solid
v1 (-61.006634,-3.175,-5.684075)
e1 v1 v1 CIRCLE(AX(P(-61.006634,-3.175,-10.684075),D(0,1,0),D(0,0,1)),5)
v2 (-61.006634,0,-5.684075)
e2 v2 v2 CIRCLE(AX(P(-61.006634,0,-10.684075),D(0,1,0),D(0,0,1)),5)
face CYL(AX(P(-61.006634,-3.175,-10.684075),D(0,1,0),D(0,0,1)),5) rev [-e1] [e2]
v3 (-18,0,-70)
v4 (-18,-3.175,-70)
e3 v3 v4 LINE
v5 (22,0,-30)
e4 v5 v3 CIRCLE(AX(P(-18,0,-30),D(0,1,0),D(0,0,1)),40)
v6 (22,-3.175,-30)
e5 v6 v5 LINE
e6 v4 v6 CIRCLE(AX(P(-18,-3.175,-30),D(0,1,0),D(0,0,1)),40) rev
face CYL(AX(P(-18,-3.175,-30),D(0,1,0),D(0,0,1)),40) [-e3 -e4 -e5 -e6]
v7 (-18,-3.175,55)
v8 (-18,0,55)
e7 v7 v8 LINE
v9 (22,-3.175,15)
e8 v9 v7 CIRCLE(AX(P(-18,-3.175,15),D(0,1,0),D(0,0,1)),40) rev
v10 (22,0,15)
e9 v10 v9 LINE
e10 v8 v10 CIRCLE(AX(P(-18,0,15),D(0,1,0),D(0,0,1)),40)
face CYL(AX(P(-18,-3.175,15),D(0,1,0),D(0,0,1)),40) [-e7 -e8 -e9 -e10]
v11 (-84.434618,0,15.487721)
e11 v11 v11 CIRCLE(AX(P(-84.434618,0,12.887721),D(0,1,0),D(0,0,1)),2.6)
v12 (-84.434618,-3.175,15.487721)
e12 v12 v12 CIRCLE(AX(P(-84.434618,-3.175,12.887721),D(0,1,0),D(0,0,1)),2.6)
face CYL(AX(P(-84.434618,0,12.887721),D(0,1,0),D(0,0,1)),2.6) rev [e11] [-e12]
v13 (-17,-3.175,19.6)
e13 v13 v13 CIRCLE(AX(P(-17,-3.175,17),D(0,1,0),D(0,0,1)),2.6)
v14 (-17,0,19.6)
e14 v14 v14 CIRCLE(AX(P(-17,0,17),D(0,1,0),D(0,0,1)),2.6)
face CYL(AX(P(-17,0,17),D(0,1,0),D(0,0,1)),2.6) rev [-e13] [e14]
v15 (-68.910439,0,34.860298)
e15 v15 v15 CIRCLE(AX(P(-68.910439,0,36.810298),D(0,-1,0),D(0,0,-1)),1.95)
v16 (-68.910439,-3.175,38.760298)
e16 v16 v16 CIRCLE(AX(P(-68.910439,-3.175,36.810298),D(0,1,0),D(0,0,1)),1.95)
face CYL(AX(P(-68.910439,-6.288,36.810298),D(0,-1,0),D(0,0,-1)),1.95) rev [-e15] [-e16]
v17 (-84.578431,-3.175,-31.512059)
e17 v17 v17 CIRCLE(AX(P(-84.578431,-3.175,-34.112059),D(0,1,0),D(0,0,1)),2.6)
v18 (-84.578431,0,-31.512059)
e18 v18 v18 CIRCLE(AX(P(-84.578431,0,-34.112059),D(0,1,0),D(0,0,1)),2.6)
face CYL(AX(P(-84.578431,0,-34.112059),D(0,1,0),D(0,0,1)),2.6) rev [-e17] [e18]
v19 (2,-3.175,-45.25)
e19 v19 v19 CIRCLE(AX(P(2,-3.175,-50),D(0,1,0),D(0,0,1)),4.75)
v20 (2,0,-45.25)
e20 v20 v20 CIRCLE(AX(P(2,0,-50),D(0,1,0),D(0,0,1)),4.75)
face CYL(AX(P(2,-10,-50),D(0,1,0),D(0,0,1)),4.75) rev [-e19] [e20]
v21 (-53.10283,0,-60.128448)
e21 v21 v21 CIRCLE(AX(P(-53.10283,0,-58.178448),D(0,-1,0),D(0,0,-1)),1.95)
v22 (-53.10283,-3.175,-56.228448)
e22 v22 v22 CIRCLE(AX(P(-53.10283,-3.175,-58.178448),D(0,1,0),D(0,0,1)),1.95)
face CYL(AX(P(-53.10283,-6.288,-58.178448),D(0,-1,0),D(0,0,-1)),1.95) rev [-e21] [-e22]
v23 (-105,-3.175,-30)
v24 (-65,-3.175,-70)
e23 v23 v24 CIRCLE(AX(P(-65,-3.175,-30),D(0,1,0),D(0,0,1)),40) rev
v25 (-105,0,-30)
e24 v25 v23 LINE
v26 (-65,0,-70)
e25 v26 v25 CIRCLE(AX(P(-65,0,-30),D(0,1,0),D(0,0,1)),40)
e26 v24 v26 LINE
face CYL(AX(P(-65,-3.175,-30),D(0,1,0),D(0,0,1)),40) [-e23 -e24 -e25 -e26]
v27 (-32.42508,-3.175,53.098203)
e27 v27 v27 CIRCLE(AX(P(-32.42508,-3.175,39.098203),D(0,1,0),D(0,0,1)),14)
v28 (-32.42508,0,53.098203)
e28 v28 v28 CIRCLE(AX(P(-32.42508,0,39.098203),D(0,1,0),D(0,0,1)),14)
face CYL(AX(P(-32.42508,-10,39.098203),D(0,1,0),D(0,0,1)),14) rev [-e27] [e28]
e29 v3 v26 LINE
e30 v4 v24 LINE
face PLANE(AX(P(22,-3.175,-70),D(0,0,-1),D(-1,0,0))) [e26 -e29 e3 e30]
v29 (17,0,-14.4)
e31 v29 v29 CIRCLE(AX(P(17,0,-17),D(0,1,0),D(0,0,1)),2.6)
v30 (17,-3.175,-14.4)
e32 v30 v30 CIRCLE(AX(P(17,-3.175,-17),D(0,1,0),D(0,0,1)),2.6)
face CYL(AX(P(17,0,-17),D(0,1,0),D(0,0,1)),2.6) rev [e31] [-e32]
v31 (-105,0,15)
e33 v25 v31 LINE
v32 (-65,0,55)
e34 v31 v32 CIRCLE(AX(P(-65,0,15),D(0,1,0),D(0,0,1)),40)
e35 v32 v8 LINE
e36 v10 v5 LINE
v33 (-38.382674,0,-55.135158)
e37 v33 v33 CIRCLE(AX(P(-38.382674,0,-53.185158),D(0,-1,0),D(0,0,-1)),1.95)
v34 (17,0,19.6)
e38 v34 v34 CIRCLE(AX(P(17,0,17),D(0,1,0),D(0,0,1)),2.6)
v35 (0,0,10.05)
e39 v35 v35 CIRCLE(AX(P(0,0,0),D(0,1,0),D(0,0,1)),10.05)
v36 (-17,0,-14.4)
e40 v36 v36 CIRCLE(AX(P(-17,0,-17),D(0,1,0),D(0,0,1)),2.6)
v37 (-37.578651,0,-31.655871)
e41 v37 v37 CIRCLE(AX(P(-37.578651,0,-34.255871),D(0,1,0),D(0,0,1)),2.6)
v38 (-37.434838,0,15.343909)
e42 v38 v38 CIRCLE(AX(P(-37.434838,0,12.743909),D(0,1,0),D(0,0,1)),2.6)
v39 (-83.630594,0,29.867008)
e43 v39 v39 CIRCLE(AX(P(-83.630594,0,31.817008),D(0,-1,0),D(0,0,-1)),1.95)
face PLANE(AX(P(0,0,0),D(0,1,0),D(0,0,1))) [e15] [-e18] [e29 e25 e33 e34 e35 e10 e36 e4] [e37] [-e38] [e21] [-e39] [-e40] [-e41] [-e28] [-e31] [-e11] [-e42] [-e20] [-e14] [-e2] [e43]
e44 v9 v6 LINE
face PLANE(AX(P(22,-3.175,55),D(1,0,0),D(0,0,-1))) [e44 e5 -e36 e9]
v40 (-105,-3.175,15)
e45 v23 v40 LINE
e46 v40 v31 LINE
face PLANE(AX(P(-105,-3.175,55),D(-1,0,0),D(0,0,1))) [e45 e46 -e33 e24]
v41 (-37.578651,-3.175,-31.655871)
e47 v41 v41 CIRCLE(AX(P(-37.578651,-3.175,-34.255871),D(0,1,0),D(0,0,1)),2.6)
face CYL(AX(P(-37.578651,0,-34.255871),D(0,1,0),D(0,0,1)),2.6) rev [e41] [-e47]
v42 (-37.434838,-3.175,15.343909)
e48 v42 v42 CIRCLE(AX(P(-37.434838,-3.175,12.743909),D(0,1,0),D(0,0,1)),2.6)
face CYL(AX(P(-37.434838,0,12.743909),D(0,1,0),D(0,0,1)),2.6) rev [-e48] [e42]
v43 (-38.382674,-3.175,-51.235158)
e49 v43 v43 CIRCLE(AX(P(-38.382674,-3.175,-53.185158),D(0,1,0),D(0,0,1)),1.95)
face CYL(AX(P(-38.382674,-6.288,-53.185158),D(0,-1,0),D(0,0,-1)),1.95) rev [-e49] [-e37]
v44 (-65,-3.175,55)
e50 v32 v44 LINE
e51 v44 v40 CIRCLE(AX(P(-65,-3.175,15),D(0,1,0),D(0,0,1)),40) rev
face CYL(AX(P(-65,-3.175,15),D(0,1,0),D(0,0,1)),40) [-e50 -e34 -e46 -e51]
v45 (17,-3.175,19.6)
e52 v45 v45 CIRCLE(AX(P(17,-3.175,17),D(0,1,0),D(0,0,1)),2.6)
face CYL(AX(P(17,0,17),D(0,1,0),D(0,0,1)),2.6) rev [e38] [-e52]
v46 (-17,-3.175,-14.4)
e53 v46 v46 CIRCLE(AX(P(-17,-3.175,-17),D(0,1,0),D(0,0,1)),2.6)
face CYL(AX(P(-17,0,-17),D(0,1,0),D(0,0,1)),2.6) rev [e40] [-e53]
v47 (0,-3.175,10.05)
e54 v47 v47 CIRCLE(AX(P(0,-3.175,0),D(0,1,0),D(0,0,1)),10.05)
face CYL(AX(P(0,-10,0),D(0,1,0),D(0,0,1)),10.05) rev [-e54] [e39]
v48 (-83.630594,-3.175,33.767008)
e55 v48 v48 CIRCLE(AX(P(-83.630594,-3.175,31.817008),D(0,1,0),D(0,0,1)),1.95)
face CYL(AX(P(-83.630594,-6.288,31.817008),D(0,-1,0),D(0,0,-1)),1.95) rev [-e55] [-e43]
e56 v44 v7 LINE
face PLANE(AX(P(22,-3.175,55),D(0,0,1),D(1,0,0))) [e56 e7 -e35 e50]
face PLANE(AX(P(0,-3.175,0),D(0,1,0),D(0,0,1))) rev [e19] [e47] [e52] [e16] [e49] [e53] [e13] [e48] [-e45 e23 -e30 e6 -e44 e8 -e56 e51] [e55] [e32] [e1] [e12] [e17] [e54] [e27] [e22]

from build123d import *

# Parameters (mm, degrees)
CROQUIS1_W                     = 127
CROQUIS1_H                     = 125
BRIDA_BASE1_DEPTH              = 3.175
CROQUIS11_R                    = 10.05
CORTAR_EXTRUIR3_DEPTH          = 10
TALADRO_DE_MARGEN_PARA_M51_D   = 5.2
TALADRO_DE_MARGEN_PARA_M52_D   = 5.2
CROQUIS16_R                    = 5
CORTAR_EXTRUIR4_DEPTH          = 127.234229213
CROQUIS17_R                    = 14
CROQUIS17_R_2                  = 4.75
CORTAR_EXTRUIR5_DEPTH          = 10
TALADRO_DE_MARGEN_PARA_M3_51_D = 3.9
REDONDEO1_R                    = 40


# Sheet-metal steps are written as plain solids
with BuildPart() as part:
    # Croquis1 → Brida base1 (new body)
    with BuildSketch(Plane(origin=(0, 0, 0), x_dir=(1, 0, 0), z_dir=(0, 1, 0))):
        with Locations((-41.5, 7.5)):
            Rectangle(CROQUIS1_W, CROQUIS1_H)
    extrude(amount=-BRIDA_BASE1_DEPTH)

    # Croquis11 → Cortar-Extruir3 (cut)
    with BuildSketch(Plane(origin=(0, 0, 0), x_dir=(1, 0, 0), z_dir=(0, 1, 0))):
        with Locations(Location((0, 0, 0), (0, 0, 270))):
            Circle(CROQUIS11_R)
    extrude(amount=-CORTAR_EXTRUIR3_DEPTH, mode=Mode.SUBTRACT)

    # Taladro de margen para M51 (through all)
    with Locations(Plane(origin=(0, 0, 0), x_dir=(1, 0, 0), z_dir=(0, 1, 0))):
        with Locations((17, 17), (-17, 17), (-17, -17), (17, -17)):
            Hole(TALADRO_DE_MARGEN_PARA_M51_D / 2)

    # Taladro de margen para M52 (through all)
    with Locations(Plane(origin=(0, 0, 0), x_dir=(1, 0, 0), z_dir=(0, 1, 0))):
        with Locations((-37.578650523, 34.25587131), (-37.434837835, -12.743908668), (-84.434617812, -12.887721356), (-84.578430501, 34.112058621), (-61.006634168, 10.684074977)):
            Hole(TALADRO_DE_MARGEN_PARA_M52_D / 2)

    # Croquis16 → Cortar-Extruir4 (cut, through all)
    with BuildSketch(Plane(origin=(0, 0, 0), x_dir=(1, 0, 0), z_dir=(0, 1, 0))):
        with Locations(Location((-61.006634168, 10.684074977, 0), (0, 0, 270))):
            Circle(CROQUIS16_R)
    extrude(amount=-CORTAR_EXTRUIR4_DEPTH, mode=Mode.SUBTRACT)

    # Croquis17 → Cortar-Extruir5 (cut)
    with BuildSketch(Plane(origin=(0, 0, 0), x_dir=(1, 0, 0), z_dir=(0, 1, 0))):
        with Locations(Location((-32.425079896, -39.098203149, 0), (0, 0, 270))):
            Circle(CROQUIS17_R)
        with Locations(Location((2, 50, 0), (0, 0, 270))):
            Circle(CROQUIS17_R_2)
    extrude(amount=-CORTAR_EXTRUIR5_DEPTH, mode=Mode.SUBTRACT)

    # Taladro de margen para M3.51 (through all)
    with Locations(Plane(origin=(-235.296017462, -6.288, -137.590485756), x_dir=(-0.5911403395410236, 0, 0.806568719308729), z_dir=(0, -1, 0))):
        with Locations((46.983235392, -222.472189169), (42.30898943, -237.296741799), (-48.324723402, -208.719537692), (-43.650477439, -193.894985062)):
            Hole(TALADRO_DE_MARGEN_PARA_M3_51_D / 2)

    # Redondeo1
    redondeo1_edges = [part.edges().sort_by_distance(p)[0] for p in [
        (22, -1.5875, 55),
        (-105, -1.5875, 55),
        (-105, -1.5875, -70),
        (22, -1.5875, -70),
    ]]
    fillet(redondeo1_edges, radius=REDONDEO1_R)


solid = part.part
